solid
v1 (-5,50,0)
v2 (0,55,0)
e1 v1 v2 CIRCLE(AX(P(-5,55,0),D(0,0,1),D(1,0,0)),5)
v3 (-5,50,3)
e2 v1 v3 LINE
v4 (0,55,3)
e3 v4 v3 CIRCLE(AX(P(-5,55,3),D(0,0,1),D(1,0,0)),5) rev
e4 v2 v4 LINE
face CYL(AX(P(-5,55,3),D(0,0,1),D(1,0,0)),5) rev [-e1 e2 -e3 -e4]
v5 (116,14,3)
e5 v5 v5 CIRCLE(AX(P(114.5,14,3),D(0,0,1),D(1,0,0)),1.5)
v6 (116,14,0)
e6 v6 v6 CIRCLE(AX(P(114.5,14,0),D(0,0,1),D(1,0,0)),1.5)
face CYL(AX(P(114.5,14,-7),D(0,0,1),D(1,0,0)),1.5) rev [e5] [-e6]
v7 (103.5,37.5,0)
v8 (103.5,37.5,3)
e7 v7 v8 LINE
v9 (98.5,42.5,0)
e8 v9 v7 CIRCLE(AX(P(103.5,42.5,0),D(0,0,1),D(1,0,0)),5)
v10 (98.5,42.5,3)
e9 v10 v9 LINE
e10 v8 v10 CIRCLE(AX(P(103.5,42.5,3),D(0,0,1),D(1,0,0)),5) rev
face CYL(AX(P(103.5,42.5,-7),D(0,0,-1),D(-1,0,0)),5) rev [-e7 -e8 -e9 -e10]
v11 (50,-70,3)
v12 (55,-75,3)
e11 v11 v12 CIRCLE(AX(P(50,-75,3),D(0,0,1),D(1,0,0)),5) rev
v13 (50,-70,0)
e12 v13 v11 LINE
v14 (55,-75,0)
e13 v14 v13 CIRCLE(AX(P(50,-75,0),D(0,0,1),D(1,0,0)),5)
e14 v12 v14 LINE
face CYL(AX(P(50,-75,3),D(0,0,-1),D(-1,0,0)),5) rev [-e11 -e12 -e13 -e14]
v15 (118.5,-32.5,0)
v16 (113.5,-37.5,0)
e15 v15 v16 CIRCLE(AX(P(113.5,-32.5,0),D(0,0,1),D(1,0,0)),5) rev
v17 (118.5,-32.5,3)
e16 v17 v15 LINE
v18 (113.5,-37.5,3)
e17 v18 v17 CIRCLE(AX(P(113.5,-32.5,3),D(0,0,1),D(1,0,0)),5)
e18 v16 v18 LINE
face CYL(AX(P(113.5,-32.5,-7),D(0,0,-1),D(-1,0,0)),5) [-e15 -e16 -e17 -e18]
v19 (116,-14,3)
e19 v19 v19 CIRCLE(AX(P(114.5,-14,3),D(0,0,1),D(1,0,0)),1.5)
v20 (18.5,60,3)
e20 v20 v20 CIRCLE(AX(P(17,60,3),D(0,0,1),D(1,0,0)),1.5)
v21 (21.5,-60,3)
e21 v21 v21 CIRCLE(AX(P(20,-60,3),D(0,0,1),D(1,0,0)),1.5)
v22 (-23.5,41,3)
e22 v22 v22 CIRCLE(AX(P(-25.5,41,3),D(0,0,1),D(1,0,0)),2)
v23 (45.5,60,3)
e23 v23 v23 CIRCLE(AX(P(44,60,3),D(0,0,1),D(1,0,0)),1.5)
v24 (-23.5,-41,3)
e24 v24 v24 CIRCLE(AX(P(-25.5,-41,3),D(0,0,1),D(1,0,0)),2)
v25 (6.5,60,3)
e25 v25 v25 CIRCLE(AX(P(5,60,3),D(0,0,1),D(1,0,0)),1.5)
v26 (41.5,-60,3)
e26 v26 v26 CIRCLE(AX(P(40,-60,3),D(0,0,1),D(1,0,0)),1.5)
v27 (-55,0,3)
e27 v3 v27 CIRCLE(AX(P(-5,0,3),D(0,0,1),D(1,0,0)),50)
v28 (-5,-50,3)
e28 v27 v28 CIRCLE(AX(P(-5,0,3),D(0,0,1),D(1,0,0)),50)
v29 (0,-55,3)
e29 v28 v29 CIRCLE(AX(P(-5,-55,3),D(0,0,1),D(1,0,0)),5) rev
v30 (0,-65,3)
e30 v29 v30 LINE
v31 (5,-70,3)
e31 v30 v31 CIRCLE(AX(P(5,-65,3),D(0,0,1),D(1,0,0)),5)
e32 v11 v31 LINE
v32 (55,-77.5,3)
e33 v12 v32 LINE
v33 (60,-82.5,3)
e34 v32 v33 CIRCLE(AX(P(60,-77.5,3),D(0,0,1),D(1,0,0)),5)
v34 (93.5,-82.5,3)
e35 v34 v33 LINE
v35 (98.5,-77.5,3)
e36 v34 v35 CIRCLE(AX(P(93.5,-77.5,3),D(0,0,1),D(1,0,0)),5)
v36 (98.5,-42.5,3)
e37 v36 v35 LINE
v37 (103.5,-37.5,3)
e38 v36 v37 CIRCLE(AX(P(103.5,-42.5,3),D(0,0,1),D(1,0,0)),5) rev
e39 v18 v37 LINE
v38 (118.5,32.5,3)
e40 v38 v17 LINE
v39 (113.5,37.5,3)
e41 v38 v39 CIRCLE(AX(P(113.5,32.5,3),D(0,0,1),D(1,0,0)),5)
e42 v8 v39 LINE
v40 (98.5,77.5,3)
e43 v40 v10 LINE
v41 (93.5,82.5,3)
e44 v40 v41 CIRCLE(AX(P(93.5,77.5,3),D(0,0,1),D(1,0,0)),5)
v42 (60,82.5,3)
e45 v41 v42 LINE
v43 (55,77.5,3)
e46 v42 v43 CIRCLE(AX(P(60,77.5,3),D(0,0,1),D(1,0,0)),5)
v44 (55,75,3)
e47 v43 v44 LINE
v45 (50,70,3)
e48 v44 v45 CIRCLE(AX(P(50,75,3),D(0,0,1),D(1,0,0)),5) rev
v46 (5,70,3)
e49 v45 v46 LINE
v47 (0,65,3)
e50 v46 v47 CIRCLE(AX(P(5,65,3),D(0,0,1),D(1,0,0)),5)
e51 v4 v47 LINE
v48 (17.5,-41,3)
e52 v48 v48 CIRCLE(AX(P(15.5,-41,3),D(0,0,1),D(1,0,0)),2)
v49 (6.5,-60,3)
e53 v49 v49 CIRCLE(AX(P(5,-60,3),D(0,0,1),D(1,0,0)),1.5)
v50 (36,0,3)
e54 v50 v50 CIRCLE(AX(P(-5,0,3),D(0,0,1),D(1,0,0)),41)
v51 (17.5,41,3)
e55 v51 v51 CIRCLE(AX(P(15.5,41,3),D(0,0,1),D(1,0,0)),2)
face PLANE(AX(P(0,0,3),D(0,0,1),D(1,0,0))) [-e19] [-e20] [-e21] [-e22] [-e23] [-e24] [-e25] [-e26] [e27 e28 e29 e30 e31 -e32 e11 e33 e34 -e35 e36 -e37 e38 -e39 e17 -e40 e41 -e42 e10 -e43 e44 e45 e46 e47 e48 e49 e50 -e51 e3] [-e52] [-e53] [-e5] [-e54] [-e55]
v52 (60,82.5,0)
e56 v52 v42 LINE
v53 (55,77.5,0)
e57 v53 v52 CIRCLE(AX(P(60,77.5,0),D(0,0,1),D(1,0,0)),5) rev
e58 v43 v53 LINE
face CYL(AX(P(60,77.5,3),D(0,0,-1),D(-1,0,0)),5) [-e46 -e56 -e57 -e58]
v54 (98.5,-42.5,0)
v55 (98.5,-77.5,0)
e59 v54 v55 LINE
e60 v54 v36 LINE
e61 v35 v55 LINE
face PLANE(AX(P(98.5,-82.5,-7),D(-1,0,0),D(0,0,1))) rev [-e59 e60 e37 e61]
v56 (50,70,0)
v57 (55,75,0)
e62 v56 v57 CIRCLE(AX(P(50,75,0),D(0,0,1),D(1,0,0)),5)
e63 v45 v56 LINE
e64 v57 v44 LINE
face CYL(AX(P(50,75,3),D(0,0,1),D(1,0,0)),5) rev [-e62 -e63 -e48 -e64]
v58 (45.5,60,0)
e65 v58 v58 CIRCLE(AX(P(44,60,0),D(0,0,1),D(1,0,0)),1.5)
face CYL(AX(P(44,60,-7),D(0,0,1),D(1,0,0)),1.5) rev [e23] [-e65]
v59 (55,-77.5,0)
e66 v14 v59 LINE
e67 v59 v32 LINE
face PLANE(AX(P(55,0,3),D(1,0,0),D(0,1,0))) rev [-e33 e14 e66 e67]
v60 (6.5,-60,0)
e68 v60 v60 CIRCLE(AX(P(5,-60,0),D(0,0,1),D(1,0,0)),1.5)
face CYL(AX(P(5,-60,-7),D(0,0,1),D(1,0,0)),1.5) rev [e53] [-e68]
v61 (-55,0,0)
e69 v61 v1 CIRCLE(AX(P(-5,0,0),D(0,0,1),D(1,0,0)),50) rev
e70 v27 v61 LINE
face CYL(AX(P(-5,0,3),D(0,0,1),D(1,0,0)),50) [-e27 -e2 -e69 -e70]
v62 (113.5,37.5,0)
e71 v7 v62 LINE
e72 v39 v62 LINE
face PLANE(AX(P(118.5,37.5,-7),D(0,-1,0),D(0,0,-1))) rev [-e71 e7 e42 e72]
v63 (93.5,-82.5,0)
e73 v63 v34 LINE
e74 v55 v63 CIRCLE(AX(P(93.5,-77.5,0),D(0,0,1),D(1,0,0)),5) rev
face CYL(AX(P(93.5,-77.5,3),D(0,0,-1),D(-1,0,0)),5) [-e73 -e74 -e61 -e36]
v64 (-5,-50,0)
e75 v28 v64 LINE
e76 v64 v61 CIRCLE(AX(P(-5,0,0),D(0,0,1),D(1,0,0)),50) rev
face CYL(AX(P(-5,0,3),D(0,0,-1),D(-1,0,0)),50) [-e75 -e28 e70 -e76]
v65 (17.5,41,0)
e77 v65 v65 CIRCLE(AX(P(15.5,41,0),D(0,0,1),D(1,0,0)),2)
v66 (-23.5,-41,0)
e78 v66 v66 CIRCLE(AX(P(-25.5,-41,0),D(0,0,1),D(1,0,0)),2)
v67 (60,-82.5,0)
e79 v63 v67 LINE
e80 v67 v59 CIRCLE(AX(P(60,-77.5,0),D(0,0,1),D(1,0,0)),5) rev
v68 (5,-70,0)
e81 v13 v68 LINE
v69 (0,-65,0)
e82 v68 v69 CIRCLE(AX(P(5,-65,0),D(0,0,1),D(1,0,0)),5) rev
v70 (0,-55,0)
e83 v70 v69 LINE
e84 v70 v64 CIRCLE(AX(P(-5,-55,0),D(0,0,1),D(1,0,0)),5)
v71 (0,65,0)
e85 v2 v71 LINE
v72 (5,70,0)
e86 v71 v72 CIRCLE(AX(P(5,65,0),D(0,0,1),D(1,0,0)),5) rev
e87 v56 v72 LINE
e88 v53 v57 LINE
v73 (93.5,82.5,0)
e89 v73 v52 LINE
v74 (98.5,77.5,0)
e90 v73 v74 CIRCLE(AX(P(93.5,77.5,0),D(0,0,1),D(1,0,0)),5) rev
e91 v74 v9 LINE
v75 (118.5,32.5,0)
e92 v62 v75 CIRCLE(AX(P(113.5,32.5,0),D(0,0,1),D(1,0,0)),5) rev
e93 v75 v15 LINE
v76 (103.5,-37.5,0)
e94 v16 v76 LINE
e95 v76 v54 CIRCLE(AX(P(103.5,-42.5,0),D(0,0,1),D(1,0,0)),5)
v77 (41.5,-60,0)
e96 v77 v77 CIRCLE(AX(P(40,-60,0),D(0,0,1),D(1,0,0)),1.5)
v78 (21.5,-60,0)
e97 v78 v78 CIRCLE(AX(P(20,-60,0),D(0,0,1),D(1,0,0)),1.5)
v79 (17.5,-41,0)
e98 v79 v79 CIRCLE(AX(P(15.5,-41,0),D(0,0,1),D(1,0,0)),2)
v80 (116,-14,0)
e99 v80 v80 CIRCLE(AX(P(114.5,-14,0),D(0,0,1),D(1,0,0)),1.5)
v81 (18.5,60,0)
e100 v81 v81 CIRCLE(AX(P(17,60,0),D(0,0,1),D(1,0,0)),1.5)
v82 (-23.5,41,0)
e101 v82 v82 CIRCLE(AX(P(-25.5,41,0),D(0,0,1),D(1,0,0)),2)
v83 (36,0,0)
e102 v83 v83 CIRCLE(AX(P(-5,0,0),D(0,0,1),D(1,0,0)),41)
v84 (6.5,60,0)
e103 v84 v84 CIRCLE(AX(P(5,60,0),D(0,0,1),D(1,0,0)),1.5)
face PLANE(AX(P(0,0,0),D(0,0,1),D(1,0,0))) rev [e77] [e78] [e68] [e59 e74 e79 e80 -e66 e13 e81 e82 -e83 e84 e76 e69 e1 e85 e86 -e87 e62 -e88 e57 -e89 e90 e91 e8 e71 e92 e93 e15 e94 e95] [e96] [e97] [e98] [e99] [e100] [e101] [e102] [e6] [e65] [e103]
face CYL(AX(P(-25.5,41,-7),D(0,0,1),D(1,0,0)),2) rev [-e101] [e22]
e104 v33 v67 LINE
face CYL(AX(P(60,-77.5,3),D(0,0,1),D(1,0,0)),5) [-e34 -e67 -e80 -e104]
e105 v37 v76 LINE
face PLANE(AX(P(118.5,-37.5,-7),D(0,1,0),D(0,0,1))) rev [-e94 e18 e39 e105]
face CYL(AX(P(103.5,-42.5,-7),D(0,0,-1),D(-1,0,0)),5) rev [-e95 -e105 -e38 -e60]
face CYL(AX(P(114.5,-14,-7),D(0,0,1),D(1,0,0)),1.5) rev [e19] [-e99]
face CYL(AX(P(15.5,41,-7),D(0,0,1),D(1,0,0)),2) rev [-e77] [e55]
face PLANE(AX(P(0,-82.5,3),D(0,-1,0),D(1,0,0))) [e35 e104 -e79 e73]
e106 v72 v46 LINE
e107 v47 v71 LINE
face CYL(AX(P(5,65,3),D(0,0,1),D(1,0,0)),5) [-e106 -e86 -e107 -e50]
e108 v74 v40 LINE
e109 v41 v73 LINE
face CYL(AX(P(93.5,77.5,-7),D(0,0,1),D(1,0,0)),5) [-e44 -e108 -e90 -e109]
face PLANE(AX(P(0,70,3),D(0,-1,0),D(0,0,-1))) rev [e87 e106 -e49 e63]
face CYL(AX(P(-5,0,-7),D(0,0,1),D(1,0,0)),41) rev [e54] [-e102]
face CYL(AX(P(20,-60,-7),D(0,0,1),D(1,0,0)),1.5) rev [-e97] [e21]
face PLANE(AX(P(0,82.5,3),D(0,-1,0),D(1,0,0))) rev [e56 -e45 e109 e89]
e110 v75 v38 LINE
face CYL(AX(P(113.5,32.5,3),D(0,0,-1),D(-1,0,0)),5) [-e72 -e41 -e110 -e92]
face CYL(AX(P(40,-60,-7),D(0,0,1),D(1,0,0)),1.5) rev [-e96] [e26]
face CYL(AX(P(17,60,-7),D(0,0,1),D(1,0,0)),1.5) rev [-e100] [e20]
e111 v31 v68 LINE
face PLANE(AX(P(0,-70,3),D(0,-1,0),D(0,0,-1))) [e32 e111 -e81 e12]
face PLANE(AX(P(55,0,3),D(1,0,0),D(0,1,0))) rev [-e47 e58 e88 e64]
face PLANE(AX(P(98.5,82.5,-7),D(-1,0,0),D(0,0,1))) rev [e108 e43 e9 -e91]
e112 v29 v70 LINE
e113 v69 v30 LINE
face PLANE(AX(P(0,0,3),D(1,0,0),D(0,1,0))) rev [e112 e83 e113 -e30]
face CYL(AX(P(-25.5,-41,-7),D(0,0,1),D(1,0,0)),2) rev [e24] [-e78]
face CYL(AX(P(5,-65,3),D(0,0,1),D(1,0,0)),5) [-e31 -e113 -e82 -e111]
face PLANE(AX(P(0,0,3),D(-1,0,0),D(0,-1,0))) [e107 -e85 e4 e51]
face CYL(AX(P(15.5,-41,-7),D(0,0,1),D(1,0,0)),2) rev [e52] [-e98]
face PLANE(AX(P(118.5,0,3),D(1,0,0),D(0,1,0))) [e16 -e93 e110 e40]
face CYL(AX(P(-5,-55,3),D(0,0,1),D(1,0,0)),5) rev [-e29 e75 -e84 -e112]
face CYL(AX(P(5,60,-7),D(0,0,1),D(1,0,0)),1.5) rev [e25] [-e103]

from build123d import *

# Parameters (mm, degrees)
SKETCH_1_W          = 110
SKETCH_1_H          = 100
SKETCH_1_W_2        = 55
SKETCH_1_H_2        = 20
EXTRUDE_1_DEPTH     = 3
FILLET_1_R          = 50
SKETCH_2_R          = 41
CUT_EXTRUDE_1_DEPTH = 10
FILLET_4_R          = 5
SKETCH_3_R          = 1.5
SKETCH_3_R_2        = 2
CUT_EXTRUDE_2_DEPTH = 10
SKETCH_4_W          = 20
SKETCH_4_H          = 45
CUT_EXTRUDE_3_DEPTH = 10
FILLET_5_R          = 5


with BuildPart() as part:
    # 草图1 → 凸台-拉伸1 (new body)
    with BuildSketch(Plane.XY):
        Rectangle(SKETCH_1_W, SKETCH_1_H)
        Polygon((55, 70), (55, 50), (55, -50), (55, -70), (55, -82.5), (118.5, -82.5), (118.5, 82.5), (55, 82.5), align=None)
        with Locations((27.5, 60)):
            Rectangle(SKETCH_1_W_2, SKETCH_1_H_2)
        with Locations((27.5, -60)):
            Rectangle(SKETCH_1_W_2, SKETCH_1_H_2)
    extrude(amount=EXTRUDE_1_DEPTH)

    # 圆角1
    fillet_1_edges = [part.edges().sort_by_distance(p)[0] for p in [
        (-55, -50, 1.5),
        (-55, 50, 1.5),
    ]]
    fillet(fillet_1_edges, radius=FILLET_1_R - 0.0001)  # a hair under: the kernel refuses the full size

    # 草图2 → 切除-拉伸1 (cut)
    with BuildSketch(Plane.XY.offset(3)):
        with Locations((-5, 0)):
            Circle(SKETCH_2_R)
    extrude(amount=-CUT_EXTRUDE_1_DEPTH, mode=Mode.SUBTRACT)

    # 圆角4
    fillet_4_edges = [part.edges().sort_by_distance(p)[0] for p in [
        (0, -70, 1.5),
        (0, -50, 1.5),
        (0, 50, 1.5),
        (0, 70, 1.5),
        (55, 70, 1.5),
        (55, -70, 1.5),
    ]]
    fillet(fillet_4_edges, radius=FILLET_4_R)

    # 草图3 → 切除-拉伸2 (cut)
    with BuildSketch(Plane.XY.offset(3)):
        with Locations((114.5, 14)):
            Circle(SKETCH_3_R)
        with Locations((114.5, -14)):
            Circle(SKETCH_3_R)
        with Locations((-25.5, 41)):
            Circle(SKETCH_3_R_2)
        with Locations((15.5, 41)):
            Circle(SKETCH_3_R_2)
        with Locations((15.5, -41)):
            Circle(SKETCH_3_R_2)
        with Locations((-25.5, -41)):
            Circle(SKETCH_3_R_2)
        with Locations((5, -60)):
            Circle(SKETCH_3_R)
        with Locations((20, -60)):
            Circle(SKETCH_3_R)
        with Locations((40, -60)):
            Circle(SKETCH_3_R)
        with Locations((5, 60)):
            Circle(SKETCH_3_R)
        with Locations((17, 60)):
            Circle(SKETCH_3_R)
        with Locations((44, 60)):
            Circle(SKETCH_3_R)
    extrude(amount=-CUT_EXTRUDE_2_DEPTH, mode=Mode.SUBTRACT)

    # 草图4 → 切除-拉伸3 (cut)
    with BuildSketch(Plane.XY.offset(3)):
        with Locations((108.5, 60)):
            Rectangle(SKETCH_4_W, SKETCH_4_H)
        with Locations((108.5, -60)):
            Rectangle(SKETCH_4_W, SKETCH_4_H)
    extrude(amount=-CUT_EXTRUDE_3_DEPTH, mode=Mode.SUBTRACT)

    # 圆角5
    fillet_5_edges = [part.edges().sort_by_distance(p)[0] for p in [
        (98.5, 82.5, 1.5),
        (118.5, 37.5, 1.5),
        (98.5, 37.5, 1.5),
        (98.5, -82.5, 1.5),
        (98.5, -37.5, 1.5),
        (118.5, -37.5, 1.5),
        (55, 82.5, 1.5),
        (55, -82.5, 1.5),
    ]]
    fillet(fillet_5_edges, radius=FILLET_5_R)


solid = part.part
